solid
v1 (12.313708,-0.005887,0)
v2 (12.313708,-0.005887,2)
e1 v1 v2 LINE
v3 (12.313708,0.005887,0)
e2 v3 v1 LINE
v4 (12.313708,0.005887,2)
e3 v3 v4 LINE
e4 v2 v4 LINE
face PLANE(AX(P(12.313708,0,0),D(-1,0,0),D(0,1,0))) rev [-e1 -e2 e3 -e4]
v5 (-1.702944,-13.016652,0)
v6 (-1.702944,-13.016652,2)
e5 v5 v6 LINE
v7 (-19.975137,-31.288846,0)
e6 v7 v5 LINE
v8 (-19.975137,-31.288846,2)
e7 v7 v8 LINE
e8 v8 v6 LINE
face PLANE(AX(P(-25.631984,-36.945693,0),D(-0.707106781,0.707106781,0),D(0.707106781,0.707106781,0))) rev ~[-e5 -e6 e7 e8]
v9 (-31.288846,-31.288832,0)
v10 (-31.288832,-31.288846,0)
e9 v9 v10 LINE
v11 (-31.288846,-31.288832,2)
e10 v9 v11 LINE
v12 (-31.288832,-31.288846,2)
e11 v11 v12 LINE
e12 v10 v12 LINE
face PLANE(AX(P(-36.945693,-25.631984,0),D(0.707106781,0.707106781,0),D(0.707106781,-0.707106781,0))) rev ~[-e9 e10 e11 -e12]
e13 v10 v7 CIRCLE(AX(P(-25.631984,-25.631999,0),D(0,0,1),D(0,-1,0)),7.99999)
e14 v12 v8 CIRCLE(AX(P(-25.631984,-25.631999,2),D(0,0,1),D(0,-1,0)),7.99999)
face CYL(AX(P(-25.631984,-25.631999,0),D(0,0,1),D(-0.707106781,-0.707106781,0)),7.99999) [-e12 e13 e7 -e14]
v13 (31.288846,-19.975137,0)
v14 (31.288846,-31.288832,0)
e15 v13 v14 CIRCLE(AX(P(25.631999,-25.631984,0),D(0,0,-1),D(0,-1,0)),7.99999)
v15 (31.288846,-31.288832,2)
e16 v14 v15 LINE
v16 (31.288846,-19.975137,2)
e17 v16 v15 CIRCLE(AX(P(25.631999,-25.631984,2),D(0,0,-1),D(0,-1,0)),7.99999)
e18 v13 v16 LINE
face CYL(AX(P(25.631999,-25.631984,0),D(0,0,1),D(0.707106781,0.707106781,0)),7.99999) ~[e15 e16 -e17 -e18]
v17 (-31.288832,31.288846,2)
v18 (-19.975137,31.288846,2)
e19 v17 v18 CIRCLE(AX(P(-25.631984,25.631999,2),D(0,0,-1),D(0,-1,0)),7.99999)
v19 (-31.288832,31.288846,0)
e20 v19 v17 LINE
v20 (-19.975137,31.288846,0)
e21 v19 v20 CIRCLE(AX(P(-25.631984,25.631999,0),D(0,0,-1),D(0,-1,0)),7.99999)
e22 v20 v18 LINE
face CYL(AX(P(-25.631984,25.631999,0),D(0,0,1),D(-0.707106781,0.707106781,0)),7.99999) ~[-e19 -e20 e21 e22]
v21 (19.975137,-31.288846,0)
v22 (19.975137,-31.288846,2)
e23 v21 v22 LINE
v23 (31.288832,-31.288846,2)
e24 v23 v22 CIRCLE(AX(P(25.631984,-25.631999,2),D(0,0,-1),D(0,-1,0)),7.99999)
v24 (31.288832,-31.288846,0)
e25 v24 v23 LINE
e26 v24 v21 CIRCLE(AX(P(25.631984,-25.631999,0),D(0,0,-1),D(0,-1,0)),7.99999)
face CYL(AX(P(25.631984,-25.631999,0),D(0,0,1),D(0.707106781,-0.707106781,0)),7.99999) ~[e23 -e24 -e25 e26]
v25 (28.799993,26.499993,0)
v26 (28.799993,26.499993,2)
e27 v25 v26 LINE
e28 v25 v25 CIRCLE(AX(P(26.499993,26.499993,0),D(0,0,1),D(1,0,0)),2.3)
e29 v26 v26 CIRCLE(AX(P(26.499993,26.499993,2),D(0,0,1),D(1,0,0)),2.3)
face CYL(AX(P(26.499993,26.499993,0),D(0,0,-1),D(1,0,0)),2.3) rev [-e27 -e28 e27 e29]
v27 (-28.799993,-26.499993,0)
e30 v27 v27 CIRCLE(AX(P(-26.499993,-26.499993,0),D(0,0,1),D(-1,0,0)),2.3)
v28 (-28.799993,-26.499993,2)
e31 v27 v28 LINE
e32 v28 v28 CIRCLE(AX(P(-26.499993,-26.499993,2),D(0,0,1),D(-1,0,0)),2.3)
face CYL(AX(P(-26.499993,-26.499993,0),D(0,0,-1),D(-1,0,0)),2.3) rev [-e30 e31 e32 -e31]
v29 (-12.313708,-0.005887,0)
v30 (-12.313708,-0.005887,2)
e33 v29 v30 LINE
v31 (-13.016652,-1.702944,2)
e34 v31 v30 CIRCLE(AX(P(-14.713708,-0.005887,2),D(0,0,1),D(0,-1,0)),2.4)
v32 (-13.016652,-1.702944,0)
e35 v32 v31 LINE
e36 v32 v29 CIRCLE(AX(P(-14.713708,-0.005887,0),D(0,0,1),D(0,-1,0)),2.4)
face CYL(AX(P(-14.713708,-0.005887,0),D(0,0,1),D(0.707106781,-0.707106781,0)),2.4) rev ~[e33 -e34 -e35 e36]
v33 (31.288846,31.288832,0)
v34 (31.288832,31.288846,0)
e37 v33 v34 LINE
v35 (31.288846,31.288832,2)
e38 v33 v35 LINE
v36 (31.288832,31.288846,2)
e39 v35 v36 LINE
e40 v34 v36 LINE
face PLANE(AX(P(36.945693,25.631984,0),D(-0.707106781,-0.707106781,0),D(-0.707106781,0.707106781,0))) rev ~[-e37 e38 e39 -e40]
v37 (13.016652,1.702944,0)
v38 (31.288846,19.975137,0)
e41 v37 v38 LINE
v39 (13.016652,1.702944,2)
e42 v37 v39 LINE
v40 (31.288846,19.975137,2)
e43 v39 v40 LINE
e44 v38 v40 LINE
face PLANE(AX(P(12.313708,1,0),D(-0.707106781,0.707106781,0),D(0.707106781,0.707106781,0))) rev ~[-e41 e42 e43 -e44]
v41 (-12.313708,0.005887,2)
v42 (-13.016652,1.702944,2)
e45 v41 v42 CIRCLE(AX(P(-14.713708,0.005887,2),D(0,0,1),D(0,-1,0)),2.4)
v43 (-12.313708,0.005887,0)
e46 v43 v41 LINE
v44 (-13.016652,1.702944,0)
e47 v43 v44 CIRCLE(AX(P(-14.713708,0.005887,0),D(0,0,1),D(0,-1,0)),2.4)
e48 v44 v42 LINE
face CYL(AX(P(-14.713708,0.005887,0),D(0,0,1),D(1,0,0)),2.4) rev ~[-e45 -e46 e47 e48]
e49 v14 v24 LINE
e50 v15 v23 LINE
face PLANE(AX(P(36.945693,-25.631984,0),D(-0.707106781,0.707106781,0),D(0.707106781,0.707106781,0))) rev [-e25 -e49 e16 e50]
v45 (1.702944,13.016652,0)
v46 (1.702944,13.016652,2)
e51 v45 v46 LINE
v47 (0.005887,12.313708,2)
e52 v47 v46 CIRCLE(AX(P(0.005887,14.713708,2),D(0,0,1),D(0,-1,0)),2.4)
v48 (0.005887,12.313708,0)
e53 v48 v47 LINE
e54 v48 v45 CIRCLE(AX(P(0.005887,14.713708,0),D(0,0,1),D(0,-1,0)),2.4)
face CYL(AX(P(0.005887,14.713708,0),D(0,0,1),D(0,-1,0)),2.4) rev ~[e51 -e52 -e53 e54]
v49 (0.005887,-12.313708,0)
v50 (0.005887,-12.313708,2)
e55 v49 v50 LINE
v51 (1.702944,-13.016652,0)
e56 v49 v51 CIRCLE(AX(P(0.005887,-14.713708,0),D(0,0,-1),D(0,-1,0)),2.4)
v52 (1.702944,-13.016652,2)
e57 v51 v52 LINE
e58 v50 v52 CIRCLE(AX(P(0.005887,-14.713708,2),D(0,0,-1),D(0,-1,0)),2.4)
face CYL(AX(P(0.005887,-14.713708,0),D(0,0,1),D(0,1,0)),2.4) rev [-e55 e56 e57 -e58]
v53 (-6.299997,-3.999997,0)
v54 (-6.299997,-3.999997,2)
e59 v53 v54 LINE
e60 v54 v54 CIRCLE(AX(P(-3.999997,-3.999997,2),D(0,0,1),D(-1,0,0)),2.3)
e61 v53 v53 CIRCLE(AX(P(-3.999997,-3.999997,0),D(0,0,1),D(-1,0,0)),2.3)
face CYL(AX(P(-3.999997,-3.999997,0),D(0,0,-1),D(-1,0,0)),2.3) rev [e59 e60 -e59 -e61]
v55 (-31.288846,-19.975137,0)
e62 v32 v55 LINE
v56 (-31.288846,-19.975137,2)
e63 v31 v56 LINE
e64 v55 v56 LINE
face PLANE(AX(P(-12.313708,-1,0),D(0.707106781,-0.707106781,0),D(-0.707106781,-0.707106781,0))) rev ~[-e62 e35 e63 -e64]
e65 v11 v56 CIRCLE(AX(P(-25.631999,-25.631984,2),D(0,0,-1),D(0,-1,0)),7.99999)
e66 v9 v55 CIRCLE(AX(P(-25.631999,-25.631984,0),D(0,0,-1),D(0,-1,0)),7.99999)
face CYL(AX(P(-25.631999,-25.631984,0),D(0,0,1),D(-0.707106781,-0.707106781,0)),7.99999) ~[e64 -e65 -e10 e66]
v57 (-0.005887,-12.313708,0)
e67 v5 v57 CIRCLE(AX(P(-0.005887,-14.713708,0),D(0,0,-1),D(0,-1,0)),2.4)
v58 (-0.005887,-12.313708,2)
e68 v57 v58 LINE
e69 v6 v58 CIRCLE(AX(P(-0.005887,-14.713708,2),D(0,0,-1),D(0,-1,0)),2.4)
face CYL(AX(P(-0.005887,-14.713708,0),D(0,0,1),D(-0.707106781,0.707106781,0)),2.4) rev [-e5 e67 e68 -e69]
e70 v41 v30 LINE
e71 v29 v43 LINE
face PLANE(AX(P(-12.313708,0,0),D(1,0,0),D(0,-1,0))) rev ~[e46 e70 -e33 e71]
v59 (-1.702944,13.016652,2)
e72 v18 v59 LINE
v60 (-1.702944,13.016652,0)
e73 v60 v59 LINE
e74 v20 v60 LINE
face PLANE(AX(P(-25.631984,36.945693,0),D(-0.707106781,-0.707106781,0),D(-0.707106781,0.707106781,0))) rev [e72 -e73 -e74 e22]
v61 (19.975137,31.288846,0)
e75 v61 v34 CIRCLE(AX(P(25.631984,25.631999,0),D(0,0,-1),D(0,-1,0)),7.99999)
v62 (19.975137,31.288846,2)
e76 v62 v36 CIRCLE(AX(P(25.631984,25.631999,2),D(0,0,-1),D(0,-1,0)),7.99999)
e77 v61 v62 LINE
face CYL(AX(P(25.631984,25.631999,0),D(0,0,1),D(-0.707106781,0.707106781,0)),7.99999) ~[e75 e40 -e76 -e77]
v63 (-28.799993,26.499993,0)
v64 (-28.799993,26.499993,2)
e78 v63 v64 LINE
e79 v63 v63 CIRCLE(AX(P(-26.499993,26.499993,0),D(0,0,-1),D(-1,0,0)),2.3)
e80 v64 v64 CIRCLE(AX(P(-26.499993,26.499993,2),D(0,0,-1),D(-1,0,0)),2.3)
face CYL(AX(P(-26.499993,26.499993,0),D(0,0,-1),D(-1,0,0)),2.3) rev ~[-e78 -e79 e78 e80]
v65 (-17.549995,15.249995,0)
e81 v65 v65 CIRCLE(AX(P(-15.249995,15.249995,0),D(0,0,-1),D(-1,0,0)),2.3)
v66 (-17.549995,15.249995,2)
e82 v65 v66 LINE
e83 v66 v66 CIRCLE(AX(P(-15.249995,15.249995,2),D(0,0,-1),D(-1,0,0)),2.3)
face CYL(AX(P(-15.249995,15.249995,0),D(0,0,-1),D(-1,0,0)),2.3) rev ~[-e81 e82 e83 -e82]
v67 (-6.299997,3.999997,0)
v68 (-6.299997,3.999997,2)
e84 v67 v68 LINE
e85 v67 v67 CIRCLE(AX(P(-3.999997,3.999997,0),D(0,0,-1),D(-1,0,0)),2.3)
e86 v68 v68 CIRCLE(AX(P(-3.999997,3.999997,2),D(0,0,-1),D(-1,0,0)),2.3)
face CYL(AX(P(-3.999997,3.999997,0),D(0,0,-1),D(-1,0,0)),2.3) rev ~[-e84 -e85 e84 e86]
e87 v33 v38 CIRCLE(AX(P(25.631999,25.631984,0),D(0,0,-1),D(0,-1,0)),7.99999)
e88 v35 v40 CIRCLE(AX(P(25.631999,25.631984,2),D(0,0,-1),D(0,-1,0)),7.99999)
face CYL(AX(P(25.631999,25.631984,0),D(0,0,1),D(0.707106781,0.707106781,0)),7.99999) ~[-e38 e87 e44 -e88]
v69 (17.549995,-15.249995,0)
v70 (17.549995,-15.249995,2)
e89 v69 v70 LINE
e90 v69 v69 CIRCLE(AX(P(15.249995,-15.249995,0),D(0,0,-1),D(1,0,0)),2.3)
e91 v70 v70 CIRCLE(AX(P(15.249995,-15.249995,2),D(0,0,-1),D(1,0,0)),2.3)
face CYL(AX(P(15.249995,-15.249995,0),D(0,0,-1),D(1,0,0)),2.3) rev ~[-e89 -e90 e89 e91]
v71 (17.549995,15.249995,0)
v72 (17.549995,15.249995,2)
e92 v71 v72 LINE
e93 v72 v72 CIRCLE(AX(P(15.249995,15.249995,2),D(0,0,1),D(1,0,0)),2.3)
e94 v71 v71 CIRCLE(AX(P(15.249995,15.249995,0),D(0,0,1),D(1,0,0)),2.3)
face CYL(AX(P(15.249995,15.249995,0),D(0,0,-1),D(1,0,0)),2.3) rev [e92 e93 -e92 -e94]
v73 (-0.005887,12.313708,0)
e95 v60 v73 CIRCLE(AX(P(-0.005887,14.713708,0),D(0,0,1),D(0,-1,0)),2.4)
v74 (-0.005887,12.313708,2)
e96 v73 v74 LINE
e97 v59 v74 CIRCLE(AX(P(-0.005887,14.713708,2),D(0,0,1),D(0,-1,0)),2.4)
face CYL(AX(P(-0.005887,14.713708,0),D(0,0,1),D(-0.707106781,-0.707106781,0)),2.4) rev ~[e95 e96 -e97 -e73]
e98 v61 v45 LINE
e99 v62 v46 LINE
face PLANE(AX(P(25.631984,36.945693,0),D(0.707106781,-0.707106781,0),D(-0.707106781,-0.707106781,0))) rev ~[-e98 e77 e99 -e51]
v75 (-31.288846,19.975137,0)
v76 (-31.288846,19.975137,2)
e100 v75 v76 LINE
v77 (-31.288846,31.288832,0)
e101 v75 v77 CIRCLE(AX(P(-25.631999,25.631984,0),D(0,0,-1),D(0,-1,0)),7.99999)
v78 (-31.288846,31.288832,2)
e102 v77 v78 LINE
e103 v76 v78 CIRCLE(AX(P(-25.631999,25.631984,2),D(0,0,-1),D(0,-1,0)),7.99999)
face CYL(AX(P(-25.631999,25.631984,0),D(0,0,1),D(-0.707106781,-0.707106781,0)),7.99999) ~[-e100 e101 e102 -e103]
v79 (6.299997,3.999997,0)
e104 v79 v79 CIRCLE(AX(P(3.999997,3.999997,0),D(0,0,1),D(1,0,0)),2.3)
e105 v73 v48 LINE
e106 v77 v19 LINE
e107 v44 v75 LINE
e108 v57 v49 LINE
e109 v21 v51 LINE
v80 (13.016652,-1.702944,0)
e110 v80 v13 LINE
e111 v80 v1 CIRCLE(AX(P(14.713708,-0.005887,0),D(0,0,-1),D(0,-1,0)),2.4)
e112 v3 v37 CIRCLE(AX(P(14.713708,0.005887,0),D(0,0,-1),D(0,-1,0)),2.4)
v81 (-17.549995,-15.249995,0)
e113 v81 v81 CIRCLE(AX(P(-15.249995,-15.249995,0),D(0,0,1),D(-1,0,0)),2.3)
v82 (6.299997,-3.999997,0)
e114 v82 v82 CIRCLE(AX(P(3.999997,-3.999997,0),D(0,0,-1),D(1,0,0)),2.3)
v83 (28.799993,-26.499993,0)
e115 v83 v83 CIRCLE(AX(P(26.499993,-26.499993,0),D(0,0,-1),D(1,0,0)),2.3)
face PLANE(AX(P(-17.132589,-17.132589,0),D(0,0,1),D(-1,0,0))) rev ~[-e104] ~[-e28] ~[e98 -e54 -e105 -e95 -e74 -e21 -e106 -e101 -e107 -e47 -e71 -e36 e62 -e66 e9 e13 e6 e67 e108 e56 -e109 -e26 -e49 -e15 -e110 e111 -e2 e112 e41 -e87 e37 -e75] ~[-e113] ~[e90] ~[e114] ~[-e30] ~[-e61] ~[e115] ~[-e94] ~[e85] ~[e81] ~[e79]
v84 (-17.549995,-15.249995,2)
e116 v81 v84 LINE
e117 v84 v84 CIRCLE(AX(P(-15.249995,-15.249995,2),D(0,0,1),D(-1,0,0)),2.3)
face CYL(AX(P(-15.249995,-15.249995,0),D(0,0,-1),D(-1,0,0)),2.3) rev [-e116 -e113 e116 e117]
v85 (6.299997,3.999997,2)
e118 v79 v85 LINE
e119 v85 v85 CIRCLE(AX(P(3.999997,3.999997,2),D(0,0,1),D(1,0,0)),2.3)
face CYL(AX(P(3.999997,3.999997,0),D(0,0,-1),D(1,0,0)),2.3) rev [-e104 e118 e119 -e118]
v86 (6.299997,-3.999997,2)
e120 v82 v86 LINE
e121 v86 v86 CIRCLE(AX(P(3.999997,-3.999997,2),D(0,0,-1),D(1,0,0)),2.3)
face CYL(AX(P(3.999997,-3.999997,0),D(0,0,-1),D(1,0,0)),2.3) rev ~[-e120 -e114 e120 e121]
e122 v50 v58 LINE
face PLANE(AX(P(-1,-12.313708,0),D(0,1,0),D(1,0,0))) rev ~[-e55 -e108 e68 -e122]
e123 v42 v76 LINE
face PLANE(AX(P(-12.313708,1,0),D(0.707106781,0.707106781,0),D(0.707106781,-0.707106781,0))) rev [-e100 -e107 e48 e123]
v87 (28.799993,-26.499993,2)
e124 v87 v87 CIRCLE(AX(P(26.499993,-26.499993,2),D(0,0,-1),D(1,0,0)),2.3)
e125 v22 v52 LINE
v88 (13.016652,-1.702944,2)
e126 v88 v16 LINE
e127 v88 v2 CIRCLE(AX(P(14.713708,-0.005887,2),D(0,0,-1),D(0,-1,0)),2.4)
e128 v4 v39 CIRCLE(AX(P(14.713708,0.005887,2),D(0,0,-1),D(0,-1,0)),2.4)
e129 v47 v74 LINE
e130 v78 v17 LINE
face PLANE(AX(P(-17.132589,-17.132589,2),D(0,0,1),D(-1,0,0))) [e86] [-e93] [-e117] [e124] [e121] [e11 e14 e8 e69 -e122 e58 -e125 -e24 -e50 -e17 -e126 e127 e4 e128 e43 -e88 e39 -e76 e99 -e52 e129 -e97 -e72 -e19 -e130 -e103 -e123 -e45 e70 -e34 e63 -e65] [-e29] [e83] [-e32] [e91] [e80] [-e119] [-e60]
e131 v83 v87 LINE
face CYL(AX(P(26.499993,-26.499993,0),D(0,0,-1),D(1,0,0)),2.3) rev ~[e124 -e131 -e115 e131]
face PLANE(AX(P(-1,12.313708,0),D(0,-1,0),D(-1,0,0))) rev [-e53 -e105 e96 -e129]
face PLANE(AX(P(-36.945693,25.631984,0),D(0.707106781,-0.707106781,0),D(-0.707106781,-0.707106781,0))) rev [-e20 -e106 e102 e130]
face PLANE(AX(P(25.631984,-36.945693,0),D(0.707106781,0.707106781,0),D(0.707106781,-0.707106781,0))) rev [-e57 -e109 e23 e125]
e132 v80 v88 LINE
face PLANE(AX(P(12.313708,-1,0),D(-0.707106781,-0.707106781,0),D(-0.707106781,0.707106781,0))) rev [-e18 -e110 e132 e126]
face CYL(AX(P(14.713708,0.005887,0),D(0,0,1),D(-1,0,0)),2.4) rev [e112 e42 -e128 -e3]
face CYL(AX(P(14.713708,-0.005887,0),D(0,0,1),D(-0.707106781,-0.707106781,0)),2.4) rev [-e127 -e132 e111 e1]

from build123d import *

# Parameters (mm, degrees)
F0_R     = 2.3
F1_DEPTH = 2
F4_R     = 7.99999
F5_R     = 2.4


# Not quite as in the source:
# - a fillet or chamfer is up to 0.001 mm smaller than in the source, because OpenCascade refuses the exact size


with BuildPart() as f1:
    # F0 (on Top) → F1 (new body)
    with BuildSketch(Plane.XY):
        Polygon((12.313708499, 1), (36.9456929209, 25.6319844219), (31.2888386714, 31.2888386714), (25.6319844219, 36.9456929209), (1, 12.313708499), (0, 11.313708499), (0, 0), (11.313708499, 0), align=None)
        with Locations((3.9999969952, 3.9999969952)):
            Circle(F0_R, mode=Mode.SUBTRACT)
        with Locations((15.2499951732, 15.2499951732)):
            Circle(F0_R, mode=Mode.SUBTRACT)
        with Locations((26.4999933512, 26.4999933512)):
            Circle(F0_R, mode=Mode.SUBTRACT)
        Polygon((0, 11.313708499), (1, 12.313708499), (0, 12.313708499), align=None)
        Polygon((12.313708499, 0), (12.313708499, 1), (11.313708499, 0), align=None)
    extrude(amount=F1_DEPTH)

    # F2: F1 across plane


with BuildPart() as f1_1:
    add(f1.part)
    add(f1.part.mirror(Plane.YZ))

    # F3: F1 across plane


with BuildPart() as f1_2:
    add(f1_1.part)
    add(f1_1.part.mirror(Plane.XZ))

    # F4 (radius 8 in the source; OpenCascade refuses exactly that, so slightly less here)
    f4_edges = [f1_2.edges().sort_by_distance(p)[0] for p in [
        (-25.631984, 36.945693, 1),
        (-36.945693, 25.631984, 1),
        (-36.945693, -25.631984, 1),
        (-25.631984, -36.945693, 1),
        (25.631984, -36.945693, 1),
        (36.945693, -25.631984, 1),
        (36.945693, 25.631984, 1),
        (25.631984, 36.945693, 1),
    ]]
    fillet(f4_edges, radius=F4_R)

    # F5
    f5_edges = [f1_2.edges().sort_by_distance(p)[0] for p in [
        (12.313708, 1, 1),
        (12.313708, -1, 1),
        (1, 12.313708, 1),
        (-1, 12.313708, 1),
        (-12.313708, 1, 1),
        (-12.313708, -1, 1),
        (-1, -12.313708, 1),
        (1, -12.313708, 1),
    ]]
    fillet(f5_edges, radius=F5_R)


solid = f1_2.part
